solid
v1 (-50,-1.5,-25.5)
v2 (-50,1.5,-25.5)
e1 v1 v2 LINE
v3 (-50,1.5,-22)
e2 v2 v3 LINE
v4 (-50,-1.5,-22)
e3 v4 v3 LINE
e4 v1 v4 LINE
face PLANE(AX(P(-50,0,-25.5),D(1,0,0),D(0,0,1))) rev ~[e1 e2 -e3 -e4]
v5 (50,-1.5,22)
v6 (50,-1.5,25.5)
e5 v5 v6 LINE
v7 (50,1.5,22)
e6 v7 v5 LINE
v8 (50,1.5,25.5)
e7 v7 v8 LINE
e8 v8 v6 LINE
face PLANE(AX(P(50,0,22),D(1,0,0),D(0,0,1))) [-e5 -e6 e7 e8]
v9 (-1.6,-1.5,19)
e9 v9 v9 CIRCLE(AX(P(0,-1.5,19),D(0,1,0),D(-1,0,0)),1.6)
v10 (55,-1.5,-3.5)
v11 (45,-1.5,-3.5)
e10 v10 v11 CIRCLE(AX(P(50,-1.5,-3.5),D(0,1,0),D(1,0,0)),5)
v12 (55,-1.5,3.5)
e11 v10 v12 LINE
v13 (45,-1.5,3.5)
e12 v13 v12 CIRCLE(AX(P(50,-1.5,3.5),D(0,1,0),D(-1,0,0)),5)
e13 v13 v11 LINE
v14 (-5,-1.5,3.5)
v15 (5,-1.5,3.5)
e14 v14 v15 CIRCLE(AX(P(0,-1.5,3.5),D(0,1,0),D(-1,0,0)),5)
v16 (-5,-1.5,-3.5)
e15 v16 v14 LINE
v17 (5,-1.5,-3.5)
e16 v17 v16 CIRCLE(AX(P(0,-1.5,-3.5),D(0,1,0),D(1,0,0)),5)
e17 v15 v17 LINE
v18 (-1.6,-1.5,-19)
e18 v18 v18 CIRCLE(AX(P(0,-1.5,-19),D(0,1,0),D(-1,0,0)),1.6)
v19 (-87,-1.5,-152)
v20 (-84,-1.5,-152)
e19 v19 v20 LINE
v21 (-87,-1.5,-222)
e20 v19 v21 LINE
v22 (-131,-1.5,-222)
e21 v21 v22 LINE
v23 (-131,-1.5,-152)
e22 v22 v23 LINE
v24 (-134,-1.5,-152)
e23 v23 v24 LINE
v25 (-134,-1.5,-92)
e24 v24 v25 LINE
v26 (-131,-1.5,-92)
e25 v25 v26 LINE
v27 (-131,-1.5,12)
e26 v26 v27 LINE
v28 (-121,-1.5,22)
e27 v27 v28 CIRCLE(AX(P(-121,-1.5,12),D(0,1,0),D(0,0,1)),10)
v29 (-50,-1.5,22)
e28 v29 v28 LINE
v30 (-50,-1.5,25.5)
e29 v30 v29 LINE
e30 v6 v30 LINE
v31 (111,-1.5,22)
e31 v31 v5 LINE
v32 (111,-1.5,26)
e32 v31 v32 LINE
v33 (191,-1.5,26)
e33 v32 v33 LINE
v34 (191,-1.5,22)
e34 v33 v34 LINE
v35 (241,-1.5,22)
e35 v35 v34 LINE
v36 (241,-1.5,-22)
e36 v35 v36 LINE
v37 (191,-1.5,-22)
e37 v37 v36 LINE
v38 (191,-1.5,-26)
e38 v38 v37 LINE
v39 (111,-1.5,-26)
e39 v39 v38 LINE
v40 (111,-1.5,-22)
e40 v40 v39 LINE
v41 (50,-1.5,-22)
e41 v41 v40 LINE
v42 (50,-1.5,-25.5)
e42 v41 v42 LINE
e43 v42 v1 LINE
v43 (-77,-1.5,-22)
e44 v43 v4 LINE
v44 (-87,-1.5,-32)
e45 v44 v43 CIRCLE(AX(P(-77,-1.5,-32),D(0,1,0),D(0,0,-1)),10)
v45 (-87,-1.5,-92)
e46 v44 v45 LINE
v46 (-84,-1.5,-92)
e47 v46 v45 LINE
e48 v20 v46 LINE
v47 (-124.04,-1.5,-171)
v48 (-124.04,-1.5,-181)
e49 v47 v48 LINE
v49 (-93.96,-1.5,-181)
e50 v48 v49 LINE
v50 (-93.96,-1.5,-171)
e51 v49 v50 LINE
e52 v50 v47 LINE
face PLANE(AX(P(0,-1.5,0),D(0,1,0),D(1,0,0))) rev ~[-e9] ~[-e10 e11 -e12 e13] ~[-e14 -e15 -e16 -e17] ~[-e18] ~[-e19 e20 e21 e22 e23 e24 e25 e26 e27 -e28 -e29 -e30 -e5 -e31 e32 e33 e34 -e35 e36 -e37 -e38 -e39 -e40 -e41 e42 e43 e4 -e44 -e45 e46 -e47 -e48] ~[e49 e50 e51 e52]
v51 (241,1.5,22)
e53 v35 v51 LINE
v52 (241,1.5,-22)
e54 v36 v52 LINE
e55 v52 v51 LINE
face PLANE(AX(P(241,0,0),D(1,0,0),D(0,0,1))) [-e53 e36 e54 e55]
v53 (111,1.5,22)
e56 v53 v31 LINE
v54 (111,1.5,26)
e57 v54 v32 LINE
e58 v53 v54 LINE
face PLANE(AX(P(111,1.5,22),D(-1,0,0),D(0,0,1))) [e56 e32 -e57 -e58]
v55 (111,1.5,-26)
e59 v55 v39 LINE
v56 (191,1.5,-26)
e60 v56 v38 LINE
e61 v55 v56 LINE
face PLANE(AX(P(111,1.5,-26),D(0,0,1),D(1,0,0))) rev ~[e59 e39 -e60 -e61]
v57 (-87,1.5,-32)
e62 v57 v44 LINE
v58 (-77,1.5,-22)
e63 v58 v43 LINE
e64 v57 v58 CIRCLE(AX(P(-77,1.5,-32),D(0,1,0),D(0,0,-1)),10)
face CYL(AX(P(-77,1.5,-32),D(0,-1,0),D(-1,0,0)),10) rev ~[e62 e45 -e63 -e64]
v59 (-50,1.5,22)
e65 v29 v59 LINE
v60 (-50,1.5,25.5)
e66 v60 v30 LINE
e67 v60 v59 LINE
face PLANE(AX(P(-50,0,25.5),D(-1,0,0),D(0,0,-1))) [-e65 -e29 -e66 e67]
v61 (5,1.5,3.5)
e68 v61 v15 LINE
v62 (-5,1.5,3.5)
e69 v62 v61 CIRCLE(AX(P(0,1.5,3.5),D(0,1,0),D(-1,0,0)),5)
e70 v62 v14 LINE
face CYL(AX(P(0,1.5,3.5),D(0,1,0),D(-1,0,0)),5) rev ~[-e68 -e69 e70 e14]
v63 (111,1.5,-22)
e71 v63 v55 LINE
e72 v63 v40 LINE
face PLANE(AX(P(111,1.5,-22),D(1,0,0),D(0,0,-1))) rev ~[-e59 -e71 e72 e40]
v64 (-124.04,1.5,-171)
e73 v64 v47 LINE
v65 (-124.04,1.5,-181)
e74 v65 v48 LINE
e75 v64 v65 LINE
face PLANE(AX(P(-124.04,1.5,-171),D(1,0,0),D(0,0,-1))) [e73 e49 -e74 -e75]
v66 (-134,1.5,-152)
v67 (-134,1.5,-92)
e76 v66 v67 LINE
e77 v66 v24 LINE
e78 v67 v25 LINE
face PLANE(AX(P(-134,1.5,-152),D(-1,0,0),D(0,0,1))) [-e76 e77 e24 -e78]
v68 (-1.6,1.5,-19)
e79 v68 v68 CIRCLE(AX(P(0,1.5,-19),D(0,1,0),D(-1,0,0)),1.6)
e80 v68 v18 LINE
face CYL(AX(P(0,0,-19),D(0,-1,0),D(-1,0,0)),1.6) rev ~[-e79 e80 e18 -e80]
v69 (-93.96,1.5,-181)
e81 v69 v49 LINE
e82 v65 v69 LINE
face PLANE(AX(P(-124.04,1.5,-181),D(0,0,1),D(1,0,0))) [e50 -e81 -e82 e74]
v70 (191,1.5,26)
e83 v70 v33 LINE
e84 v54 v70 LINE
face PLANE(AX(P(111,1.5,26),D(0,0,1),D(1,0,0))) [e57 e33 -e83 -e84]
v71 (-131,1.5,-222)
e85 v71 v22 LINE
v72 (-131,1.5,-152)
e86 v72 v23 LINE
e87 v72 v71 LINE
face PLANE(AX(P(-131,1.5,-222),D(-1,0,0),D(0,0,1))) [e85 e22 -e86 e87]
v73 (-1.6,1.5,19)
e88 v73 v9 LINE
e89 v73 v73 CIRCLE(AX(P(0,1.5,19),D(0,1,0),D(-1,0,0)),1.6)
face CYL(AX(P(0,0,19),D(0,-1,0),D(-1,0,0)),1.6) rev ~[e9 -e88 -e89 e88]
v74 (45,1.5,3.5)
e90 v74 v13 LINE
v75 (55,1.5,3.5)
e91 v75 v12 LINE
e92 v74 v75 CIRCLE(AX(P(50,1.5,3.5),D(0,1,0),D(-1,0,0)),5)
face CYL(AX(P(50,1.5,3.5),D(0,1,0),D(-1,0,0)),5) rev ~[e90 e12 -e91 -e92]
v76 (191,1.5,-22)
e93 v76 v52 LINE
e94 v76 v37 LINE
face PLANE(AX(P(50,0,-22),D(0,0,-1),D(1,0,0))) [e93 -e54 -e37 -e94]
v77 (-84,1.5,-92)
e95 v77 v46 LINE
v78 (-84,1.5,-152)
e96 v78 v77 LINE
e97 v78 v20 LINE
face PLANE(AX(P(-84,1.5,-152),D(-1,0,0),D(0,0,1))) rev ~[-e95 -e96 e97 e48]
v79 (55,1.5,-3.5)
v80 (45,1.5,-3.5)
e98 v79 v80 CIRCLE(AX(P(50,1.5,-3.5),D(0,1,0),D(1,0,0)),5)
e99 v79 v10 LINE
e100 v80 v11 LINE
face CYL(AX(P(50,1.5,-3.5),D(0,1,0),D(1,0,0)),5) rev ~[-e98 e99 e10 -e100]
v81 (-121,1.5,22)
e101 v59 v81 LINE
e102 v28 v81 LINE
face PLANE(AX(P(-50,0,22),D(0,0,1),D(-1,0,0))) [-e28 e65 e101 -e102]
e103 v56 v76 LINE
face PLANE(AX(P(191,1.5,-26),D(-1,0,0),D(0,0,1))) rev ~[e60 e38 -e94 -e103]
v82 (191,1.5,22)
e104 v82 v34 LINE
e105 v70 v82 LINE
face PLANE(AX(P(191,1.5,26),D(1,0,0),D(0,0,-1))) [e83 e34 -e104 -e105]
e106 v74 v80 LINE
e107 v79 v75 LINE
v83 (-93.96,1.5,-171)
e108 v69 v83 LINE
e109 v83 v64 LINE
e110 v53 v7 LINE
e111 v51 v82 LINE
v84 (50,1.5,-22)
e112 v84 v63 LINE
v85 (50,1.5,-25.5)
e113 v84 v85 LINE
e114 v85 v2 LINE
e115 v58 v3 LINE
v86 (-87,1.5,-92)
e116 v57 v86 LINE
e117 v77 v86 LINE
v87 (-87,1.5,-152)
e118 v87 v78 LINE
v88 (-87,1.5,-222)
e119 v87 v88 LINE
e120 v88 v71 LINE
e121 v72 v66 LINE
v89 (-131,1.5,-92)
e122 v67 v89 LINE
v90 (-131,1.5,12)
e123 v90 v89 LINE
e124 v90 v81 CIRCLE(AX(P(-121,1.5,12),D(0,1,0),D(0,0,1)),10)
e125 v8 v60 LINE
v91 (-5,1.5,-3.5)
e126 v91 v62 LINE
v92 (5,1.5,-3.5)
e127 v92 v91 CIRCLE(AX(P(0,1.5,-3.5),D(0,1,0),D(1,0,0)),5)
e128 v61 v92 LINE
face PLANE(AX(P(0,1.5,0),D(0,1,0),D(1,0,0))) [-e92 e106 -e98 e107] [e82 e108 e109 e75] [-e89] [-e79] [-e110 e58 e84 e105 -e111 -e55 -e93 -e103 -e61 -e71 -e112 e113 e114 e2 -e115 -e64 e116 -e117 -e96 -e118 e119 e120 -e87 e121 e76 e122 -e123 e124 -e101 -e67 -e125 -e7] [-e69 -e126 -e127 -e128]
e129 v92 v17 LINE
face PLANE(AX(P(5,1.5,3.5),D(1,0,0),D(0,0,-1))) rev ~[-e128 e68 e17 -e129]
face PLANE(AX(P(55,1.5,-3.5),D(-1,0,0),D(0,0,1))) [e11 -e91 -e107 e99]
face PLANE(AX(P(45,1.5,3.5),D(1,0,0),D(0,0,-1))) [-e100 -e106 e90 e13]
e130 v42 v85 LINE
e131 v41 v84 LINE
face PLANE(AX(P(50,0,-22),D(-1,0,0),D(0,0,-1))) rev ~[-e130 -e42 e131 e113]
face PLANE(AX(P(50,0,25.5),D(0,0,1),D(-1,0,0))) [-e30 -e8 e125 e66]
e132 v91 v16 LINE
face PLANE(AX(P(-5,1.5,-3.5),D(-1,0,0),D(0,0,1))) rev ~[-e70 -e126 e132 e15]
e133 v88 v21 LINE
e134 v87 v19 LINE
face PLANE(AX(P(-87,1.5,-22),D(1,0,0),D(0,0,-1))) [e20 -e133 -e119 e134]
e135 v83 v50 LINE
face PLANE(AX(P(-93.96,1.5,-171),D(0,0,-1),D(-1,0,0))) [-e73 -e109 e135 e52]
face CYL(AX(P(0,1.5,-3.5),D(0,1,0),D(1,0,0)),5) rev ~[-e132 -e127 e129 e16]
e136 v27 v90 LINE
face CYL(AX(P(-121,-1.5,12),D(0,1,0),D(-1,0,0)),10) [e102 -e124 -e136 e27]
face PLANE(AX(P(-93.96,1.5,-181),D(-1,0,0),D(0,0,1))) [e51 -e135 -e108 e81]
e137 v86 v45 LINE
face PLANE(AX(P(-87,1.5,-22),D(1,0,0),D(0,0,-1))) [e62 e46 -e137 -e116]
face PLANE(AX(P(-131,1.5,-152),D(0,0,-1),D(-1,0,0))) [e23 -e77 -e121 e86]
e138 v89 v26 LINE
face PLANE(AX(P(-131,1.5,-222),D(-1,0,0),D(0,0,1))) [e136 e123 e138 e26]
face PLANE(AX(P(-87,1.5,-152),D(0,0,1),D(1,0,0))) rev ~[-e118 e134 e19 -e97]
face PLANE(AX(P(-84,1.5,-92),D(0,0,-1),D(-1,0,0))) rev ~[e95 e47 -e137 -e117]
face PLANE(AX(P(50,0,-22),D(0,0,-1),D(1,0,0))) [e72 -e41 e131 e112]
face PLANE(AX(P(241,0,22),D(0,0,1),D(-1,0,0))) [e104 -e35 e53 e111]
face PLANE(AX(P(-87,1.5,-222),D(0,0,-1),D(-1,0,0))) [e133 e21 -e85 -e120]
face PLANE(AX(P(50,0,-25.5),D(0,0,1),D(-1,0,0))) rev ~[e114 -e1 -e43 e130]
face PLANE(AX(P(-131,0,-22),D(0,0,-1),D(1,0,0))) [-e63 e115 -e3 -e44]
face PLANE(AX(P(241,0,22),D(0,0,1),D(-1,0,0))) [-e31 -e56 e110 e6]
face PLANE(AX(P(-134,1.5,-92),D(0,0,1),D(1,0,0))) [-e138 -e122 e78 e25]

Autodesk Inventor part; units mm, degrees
ref_plane "YZ Plane" through (0, 0, 0) normal (1, 0, 0) x (0, 1, 0)
ref_plane "XZ Plane" through (0, 0, 0) normal (0, 1, 0) x (-1, 0, 0)
ref_plane "XY Plane" through (0, 0, 0) normal (0, 0, 1) x (1, 0, 0)
sketch "Sketch6" plane through (0, 1.5, 0) normal (0, 1, 0) x (1, 0, 0)
  line L0 (-131, 222) -> (-131, -12)
  line L1 (-131, 152) -> (-134, 152)
  line L2 (-134, 152) -> (-134, 92)
  line L3 (-134, 92) -> (-131, 92)
  line L4 (-131, 92) -> (-131, 152)
  line L5 (-87, 222) -> (-131, 222)
  line L6 (-109, 222) -> (-109, 171)
  line L7 (-124.04, 171) -> (-93.96, 171)
  line L8 (-87, 152) -> (-84, 152)
  line L9 (-84, 152) -> (-84, 92)
  line L10 (-84, 92) -> (-87, 92)
  line L11 (-87, 92) -> (-87, 152)
  point P0 (0, 0)
  point P1 (-134, 122)
  point P2 (-84, 122)
  dimension "d38" = 3
  dimension "d39" = 60
  dimension "d40" = 100
sketch "Sketch1" plane through (0, 0, 0) normal (0, 1, 0) x (-1, 0, 0)
  line L0 (-241, 22) -> (241, 22)
  line L1 (241, 22) -> (241, -22)
  line L2 (241, -22) -> (-241, -22)
  line L3 (-241, -22) -> (-241, 22)
  line L4 (-241, 22) -> (241, -22) construction
  line L5 (241, 22) -> (-241, -22) construction
  line L6 (50, -22) -> (-50, -22)
  line L7 (-50, -22) -> (-50, -25.5)
  line L8 (-50, -25.5) -> (50, -25.5)
  line L9 (50, -25.5) -> (50, -22)
  line L10 (50, -22) -> (-50, -25.5) construction
  line L11 (-50, -22) -> (50, -25.5) construction
  line L12 (241, 0) -> (-241, 0)
  line L13 (50, 22) -> (-50, 22)
  line L14 (-50, 22) -> (-50, 25.5)
  line L15 (-50, 25.5) -> (50, 25.5)
  line L16 (50, 25.5) -> (50, 22)
  line L17 (50, 22) -> (-50, 25.5) construction
  line L18 (-50, 22) -> (50, 25.5) construction
  line L19 (121, 15) -> (115.8, 15)
  line L20 (115.8, 15) -> (115.8, -15)
  line L21 (115.8, -15) -> (121, -15)
  line L22 (121, -15) -> (121, 15)
  line L23 (121, 15) -> (115.8, -15) construction
  line L24 (115.8, 15) -> (121, -15) construction
  circle A0 centre (0, -19) radius 1.6
  circle A1 centre (0, 19) radius 1.6
  line L25 (131, -22) -> (131, 22)
  point P0 (0, 0)
  point P1 (0, -23.75)
  point P2 (0, -22)
  point P3 (0, 23.75)
  point P4 (0, 22)
  point P5 (50, -22)
  point P6 (50, 22)
  point P7 (-50, 22)
  point P8 (-50, -22)
  point P9 (118.4, 0)
  point P10 (0, 0)
  dimension "d0" = 482
  dimension "d1" = 44
  dimension "d2" = 100
  dimension "d3" = 3.5
  dimension "d5" = 5.2
  dimension "d6" = 30
  dimension "d8" = 3.2
  dimension "d9" = 38
  dimension "d23" = 10
  dimension "d24" = 110
extrude "Plate1" add sketch "Sketch1" along normal mid plane 3 contours L0 L25 L12 L22 L19 L20 L3 | L14 L15 L16 L0 | L12 L20 L21 L22 L25 L2 L3 | L20 L19 L22 L12 | L12 L22 L21 L20 | L2 L9 L8 L7
sketch "Sketch2" plane through (0, 1.5, 0) normal (0, 1, 0) x (1, 0, 0)
  line L0 (0, -3.5) -> (0, 3.5) construction
  line L1 (5, -3.5) -> (5, 3.5)
  line L2 (-5, 3.5) -> (-5, -3.5)
  arc A0 (-5, -3.5) -> (5, -3.5) centre (0, -3.5) ccw
  arc A1 (5, 3.5) -> (-5, 3.5) centre (0, 3.5) ccw
  line L3 (-50, -25.5) -> (50, -25.5) projected
  line L4 (25, -25.5) -> (25, 25.5)
  line L5 (50, 25.5) -> (-50, 25.5) projected
  circle A2 centre (0, -19) radius 1.6 projected
  line L6 (50, -3.5) -> (50, 3.5) construction
  line L7 (45, -3.5) -> (45, 3.5)
  line L8 (55, 3.5) -> (55, -3.5)
  arc A3 (45, -3.5) -> (55, -3.5) centre (50, -3.5) ccw
  arc A4 (55, 3.5) -> (45, 3.5) centre (50, 3.5) ccw
  point P0 (0, 0)
  point P1 (0, 8.5)
  point P2 (0, -8.5)
  point P3 (50, 0)
  point P4 (50, 8.5)
  point P5 (50, -8.5)
  dimension "d10" = 17
  dimension "d11" = 5
  dimension "d12" = 25
extrude "Cut1" cut sketch "Sketch2" against normal blind 3 contours A0 L2 A1 L1 | L7 A4 L8 A3
sketch "Sketch3" plane through (0, 1.5, 0) normal (0, 1, 0) x (1, 0, 0)
  line L0 (-50, -25.5) -> (50, -25.5)
  line L1 (0, -25.5) -> (0, 25.5)
  line L2 (50, 25.5) -> (-50, 25.5)
  line L3 (-241, 0) -> (241, 0)
  line L4 (241, -22) -> (241, 22)
  line L5 (50, 22) -> (-50, 22)
  line L6 (191, 22) -> (111, 22)
  line L7 (111, 22) -> (111, 26)
  line L8 (111, 26) -> (191, 26)
  line L9 (191, 26) -> (191, 22)
  line L10 (191, -26) -> (191, -22)
  line L11 (191, -22) -> (111, -22)
  line L12 (111, -22) -> (111, -26)
  line L13 (111, -26) -> (191, -26)
  point P0 (0, 0)
  point P1 (151, 22)
  point P2 (151, -22)
sheet face with bend "Face2" sketch "Sketch3" thickness 3 toward (0, -1, 0) bend radius 3
bend "Bend1"
sketch "Sketch4" plane through (0, 1.5, 0) normal (0, 1, 0) x (1, 0, 0)
  line L0 (-50, 22) -> (-131, 22)
  line L1 (-131, 22) -> (-87, 22)
  line L2 (-87, 22) -> (-87, 222)
  line L3 (-87, 222) -> (-131, 222)
  line L4 (-131, 222) -> (-131, 22)
  point P0 (0, 0)
  dimension "d25" = 44
  dimension "d26" = 200
sheet face with bend "Face3" sketch "Sketch4" thickness 3 toward (0, -1, 0) bend radius 3
bend "Bend2"
fillet "Corner Round1" radius 10 2 edges at (-87, 0, -22) (-131, 0, 22)
sketch "Sketch5" plane through (0, 1.5, 0) normal (0, 1, 0) x (1, 0, 0)
  line L0 (-124.04, 181) -> (-93.96, 181)
  line L1 (-93.96, 181) -> (-93.96, 171)
  line L2 (-93.96, 171) -> (-124.04, 171)
  line L3 (-124.04, 171) -> (-124.04, 181)
  line L4 (-87, 222) -> (-131, 222) projected
  point P0 (0, 0)
  point P1 (-109, 222)
  point P2 (-109, 181)
  dimension "d33" = 41
  dimension "d34" = 10
  dimension "d35" = 30.08
extrude "Cut2" cut sketch "Sketch5" against normal blind 3
sheet face with bend "Face4" sketch "Sketch6" thickness 3 toward (0, -1, 0) bend radius 3
bend "Bend3"
equation "\"d13\" = Thickness"
equation "\"d36\" = Thickness"
equation "\"d4\" = Thickness"
equation "\"d18\" = BendRadius"
equation "\"d19\" = BendReliefWidth"
equation "\"d21\" = MinimumRemnant"
equation "\"d20\" = BendReliefDepth"
equation "\"d22\" = TransitionRadius"
equation "\"d27\" = BendRadius"
equation "\"d28\" = BendReliefWidth"
equation "\"d30\" = MinimumRemnant"
equation "\"d29\" = BendReliefDepth"
equation "\"d31\" = TransitionRadius"
equation "\"d41\" = BendRadius"
equation "\"d42\" = BendReliefWidth"
equation "\"d44\" = MinimumRemnant"
equation "\"d43\" = BendReliefDepth"
equation "\"d45\" = TransitionRadius"
equation "\"BendRadius\" = Thickness"
equation "\"BendReliefWidth\" = Thickness"
equation "\"BendReliefDepth\" = 0.5 * Thickness"
equation "\"CornerReliefSize\" = 4 * Thickness"
equation "\"MinimumRemnant\" = 2 * Thickness"
equation "\"TransitionRadius\" = BendRadius"
equation "\"JacobiRadiusSize\" = BendRadius"
equation "\"GapSize\" = Thickness"
equation "\"Thickness\" = 3"
properties part number "Path"
